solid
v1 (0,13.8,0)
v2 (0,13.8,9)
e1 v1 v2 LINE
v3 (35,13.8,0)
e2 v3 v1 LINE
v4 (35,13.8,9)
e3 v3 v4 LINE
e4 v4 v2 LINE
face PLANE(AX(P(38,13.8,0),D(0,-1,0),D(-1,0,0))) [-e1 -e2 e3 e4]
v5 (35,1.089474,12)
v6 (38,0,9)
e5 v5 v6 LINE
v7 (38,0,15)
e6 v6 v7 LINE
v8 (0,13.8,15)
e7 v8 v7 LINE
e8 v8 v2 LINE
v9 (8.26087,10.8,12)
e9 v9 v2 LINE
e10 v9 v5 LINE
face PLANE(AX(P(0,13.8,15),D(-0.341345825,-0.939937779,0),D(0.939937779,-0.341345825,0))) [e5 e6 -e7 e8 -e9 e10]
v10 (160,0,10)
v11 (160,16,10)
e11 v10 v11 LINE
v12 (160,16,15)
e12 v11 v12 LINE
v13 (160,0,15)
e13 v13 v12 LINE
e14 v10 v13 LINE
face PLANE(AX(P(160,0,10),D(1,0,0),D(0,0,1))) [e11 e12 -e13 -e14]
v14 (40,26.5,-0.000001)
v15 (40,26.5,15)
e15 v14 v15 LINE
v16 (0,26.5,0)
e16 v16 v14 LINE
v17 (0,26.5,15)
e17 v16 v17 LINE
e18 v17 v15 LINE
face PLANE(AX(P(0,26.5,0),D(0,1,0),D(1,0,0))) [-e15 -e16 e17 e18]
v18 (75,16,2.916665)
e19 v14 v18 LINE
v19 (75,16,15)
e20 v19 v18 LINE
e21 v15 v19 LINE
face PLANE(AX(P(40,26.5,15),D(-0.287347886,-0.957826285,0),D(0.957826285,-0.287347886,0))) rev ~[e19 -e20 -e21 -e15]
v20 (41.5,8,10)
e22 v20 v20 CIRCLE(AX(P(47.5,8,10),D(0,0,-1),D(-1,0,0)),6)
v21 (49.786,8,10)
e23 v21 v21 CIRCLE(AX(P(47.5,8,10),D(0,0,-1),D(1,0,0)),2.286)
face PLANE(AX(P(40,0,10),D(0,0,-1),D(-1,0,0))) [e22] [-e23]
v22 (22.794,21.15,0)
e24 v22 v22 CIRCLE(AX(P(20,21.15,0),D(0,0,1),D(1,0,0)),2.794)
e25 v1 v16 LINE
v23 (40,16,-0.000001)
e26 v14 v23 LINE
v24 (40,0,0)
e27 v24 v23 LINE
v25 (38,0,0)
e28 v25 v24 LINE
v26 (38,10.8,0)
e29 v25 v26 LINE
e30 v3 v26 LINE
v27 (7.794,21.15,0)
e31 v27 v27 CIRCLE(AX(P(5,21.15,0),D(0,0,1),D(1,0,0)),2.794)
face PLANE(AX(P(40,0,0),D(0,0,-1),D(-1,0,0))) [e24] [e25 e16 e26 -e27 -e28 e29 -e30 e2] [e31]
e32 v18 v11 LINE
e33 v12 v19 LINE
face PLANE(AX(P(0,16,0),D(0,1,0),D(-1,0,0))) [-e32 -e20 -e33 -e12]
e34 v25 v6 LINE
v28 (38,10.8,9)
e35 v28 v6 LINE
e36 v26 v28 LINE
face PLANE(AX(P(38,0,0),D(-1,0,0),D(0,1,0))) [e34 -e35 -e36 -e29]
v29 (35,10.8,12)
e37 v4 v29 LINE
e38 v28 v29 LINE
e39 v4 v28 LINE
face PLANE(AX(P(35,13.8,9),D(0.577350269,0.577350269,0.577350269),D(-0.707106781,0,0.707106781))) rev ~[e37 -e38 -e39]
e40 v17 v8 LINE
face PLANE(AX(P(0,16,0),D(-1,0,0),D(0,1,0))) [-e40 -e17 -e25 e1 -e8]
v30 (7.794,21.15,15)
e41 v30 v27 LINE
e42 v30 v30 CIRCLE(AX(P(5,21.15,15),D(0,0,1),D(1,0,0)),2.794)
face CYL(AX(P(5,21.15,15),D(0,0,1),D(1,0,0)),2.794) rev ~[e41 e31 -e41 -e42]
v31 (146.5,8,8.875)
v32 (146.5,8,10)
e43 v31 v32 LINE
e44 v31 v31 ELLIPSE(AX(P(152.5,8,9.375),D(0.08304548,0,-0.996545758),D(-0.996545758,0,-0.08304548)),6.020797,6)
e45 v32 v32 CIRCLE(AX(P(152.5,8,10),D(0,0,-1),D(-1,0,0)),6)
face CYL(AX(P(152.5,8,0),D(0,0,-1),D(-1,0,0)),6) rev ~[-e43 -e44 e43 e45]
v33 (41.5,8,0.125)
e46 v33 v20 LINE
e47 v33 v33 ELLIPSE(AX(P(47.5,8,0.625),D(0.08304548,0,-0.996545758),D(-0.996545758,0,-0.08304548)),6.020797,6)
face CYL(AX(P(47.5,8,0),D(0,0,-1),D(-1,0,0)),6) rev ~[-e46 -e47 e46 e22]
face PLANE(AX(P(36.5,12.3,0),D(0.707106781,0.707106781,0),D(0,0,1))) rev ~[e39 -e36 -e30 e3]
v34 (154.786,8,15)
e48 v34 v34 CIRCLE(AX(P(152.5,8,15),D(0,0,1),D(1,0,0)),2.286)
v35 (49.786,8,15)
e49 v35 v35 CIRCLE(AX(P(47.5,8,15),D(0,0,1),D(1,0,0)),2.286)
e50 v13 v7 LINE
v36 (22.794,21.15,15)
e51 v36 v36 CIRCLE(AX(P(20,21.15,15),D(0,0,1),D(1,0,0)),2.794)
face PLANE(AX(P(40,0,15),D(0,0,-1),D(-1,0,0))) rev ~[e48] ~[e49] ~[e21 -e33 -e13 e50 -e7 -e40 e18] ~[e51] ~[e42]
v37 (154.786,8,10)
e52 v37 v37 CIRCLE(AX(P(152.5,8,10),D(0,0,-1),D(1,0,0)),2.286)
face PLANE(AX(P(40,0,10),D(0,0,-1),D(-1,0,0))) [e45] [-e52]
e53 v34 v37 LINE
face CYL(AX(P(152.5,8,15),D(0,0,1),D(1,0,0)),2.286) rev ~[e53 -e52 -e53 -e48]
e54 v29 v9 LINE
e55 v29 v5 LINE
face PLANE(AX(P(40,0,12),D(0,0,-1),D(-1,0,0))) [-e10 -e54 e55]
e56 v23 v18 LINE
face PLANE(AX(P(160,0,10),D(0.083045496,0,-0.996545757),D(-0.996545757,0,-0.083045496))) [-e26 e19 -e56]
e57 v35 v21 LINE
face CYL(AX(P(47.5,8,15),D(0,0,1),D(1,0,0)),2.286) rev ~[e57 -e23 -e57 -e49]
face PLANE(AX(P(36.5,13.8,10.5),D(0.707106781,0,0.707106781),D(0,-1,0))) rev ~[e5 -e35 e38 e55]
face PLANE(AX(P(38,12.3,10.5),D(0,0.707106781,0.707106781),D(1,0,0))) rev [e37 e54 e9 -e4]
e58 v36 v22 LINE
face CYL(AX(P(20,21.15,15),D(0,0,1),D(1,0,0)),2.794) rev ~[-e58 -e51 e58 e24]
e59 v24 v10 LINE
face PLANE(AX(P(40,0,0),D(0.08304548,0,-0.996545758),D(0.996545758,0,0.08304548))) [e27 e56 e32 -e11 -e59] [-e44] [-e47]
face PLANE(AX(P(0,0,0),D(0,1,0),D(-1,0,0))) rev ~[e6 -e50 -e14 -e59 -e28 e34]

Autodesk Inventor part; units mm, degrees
ref_plane "YZ Plane" through (0, 0, 0) normal (1, 0, 0) x (0, 1, 0)
ref_plane "XZ Plane" through (0, 0, 0) normal (0, 1, 0) x (-1, 0, 0)
ref_plane "XY Plane" through (0, 0, 0) normal (0, 0, 1) x (1, 0, 0)
sketch "Sketch1" plane through (0, 0, 0) normal (0, 1, 0) x (-1, 0, 0)
  line L0 (0, 0) -> (-40, 0)
  line L1 (-40, 0) -> (-160, 10)
  line L2 (-160, 10) -> (-160, 15)
  line L3 (-160, 15) -> (0, 15)
  line L4 (0, 15) -> (0, 0)
  point P0 (-160, 12.5)
  dimension "d0" = 15
  dimension "d1" = 40
  dimension "d2" = 5
  dimension "d3" = 120
extrude "Extrusion1" add sketch "Sketch1" along normal blind 16
sketch "Sketch2" plane through (0, 0, 15) normal (0, 0, 1) x (1, 0, 0)
  circle A0 centre (152.5, 8) radius 2.286
  circle A1 centre (47.5, 8) radius 2.286
  line L0 (160, 0) -> (160, 16) projected
  point P0 (0, 0)
  point P1 (160, 8)
  dimension "d6" = 4.572
  dimension "d7" = 7.5
  dimension "d8" = 105
extrude "Extrusion2" cut sketch "Sketch2" against normal blind 20
sketch "Sketch3" plane through (40, 0, 0) normal (0, 0, -1) x (-1, 0, 0)
  circle A0 centre (-112.5, 8) radius 2.286 projected
  circle A1 centre (-112.5, 8) radius 6
  circle A2 centre (-7.5, 8) radius 2.286 projected
  circle A3 centre (-7.5, 8) radius 6
  point P0 (40, 0)
  dimension "d11" = 12
extrude "Extrusion3" cut sketch "Sketch3" against normal up to surface (10 mm away)
sketch "Sketch4" plane through (40, 0, 0) normal (0, 0, -1) x (-1, 0, 0)
  line L0 (40, 0) -> (40, 16) projected
  line L1 (40, 0) -> (40, 16) projected
  line L2 (40, 16) -> (40, 26.5)
  line L3 (40, 26.5) -> (0, 26.5)
  line L4 (0, 26.5) -> (0, 16)
  line L5 (0, 0) -> (0, 16) projected
  line L6 (0, 0) -> (40, 0) projected
  line L7 (40, 0) -> (40, 16) projected
  line L8 (0, 16) -> (40, 16) projected
  point P0 (40, 8)
  dimension "d14" = 18.5
extrude "Extrusion4" add sketch "Sketch4" against normal up to surface (15 mm away) contours L8 L4 L3 L2
sketch "Sketch5" plane through (40, 0, 0) normal (0, 0, -1) x (-1, 0, 0)
  line L0 (40, 0) -> (-120, 0) projected
  line L1 (2, 0) -> (2, 13.8)
  line L2 (2, 13.8) -> (40, 13.8)
  line L3 (40, 0) -> (40, 26.5) projected
  line L4 (40, 26.5) -> (0, 26.5) projected
  line L5 (0, 26.5) -> (0, 16) projected
  dimension "d17" = 12.7
  dimension "d18" = 2
extrude "Extrusion5" cut sketch "Sketch5" against normal through all
sketch "Sketch6" plane through (40, 0, 15) normal (0, 0, -1) x (-1, 0, 0)
  line L0 (40, 13.8) -> (40, 26.5) projected
  line L1 (2, 13.8) -> (2, 0) projected
  line L2 (40, 13.8) -> (2, 0)
  line L3 (2, 13.8) -> (40, 13.8) projected
  point P0 (40, 0)
extrude "Extrusion6" add sketch "Sketch6" along normal blind 3
chamfer "Chamfer1" distance 3 angle 45 3 edges at (38, 6.9, 12) (38, 13.8, 6) (19, 13.8, 12)
sketch "Sketch7" plane through (160, 0, 15) normal (0, 0, 1) x (1, 0, 0)
  line L0 (-120, 26.5) -> (-120, 16) projected
  line L1 (-120, 26.5) -> (-85, 16)
  line L2 (-120, 16) -> (0, 16) projected
  point P0 (-160, 0)
  dimension "d29" = 35
extrude "Extrusion7" add sketch "Sketch7" against normal up to surface surface through (160, 0, 10) normal (0.0830455, 0, -0.9965458)
sketch "Sketch9" plane through (160, 0, 15) normal (0, 0, 1) x (1, 0, 0)
  circle A0 centre (-140, 21.15) radius 2.794
  circle A1 centre (-155, 21.15) radius 2.794
  line L0 (-160, 13.8) -> (-160, 26.5) projected
  point P0 (-160, 0)
  point P1 (-160, 15.8)
  point P2 (-160, 21.15)
  dimension "d32" = 5.588
  dimension "d33" = 15
  dimension "d34" = 5
extrude "Extrusion8" cut sketch "Sketch9" against normal through all
properties part number "Fan_side_mount"
